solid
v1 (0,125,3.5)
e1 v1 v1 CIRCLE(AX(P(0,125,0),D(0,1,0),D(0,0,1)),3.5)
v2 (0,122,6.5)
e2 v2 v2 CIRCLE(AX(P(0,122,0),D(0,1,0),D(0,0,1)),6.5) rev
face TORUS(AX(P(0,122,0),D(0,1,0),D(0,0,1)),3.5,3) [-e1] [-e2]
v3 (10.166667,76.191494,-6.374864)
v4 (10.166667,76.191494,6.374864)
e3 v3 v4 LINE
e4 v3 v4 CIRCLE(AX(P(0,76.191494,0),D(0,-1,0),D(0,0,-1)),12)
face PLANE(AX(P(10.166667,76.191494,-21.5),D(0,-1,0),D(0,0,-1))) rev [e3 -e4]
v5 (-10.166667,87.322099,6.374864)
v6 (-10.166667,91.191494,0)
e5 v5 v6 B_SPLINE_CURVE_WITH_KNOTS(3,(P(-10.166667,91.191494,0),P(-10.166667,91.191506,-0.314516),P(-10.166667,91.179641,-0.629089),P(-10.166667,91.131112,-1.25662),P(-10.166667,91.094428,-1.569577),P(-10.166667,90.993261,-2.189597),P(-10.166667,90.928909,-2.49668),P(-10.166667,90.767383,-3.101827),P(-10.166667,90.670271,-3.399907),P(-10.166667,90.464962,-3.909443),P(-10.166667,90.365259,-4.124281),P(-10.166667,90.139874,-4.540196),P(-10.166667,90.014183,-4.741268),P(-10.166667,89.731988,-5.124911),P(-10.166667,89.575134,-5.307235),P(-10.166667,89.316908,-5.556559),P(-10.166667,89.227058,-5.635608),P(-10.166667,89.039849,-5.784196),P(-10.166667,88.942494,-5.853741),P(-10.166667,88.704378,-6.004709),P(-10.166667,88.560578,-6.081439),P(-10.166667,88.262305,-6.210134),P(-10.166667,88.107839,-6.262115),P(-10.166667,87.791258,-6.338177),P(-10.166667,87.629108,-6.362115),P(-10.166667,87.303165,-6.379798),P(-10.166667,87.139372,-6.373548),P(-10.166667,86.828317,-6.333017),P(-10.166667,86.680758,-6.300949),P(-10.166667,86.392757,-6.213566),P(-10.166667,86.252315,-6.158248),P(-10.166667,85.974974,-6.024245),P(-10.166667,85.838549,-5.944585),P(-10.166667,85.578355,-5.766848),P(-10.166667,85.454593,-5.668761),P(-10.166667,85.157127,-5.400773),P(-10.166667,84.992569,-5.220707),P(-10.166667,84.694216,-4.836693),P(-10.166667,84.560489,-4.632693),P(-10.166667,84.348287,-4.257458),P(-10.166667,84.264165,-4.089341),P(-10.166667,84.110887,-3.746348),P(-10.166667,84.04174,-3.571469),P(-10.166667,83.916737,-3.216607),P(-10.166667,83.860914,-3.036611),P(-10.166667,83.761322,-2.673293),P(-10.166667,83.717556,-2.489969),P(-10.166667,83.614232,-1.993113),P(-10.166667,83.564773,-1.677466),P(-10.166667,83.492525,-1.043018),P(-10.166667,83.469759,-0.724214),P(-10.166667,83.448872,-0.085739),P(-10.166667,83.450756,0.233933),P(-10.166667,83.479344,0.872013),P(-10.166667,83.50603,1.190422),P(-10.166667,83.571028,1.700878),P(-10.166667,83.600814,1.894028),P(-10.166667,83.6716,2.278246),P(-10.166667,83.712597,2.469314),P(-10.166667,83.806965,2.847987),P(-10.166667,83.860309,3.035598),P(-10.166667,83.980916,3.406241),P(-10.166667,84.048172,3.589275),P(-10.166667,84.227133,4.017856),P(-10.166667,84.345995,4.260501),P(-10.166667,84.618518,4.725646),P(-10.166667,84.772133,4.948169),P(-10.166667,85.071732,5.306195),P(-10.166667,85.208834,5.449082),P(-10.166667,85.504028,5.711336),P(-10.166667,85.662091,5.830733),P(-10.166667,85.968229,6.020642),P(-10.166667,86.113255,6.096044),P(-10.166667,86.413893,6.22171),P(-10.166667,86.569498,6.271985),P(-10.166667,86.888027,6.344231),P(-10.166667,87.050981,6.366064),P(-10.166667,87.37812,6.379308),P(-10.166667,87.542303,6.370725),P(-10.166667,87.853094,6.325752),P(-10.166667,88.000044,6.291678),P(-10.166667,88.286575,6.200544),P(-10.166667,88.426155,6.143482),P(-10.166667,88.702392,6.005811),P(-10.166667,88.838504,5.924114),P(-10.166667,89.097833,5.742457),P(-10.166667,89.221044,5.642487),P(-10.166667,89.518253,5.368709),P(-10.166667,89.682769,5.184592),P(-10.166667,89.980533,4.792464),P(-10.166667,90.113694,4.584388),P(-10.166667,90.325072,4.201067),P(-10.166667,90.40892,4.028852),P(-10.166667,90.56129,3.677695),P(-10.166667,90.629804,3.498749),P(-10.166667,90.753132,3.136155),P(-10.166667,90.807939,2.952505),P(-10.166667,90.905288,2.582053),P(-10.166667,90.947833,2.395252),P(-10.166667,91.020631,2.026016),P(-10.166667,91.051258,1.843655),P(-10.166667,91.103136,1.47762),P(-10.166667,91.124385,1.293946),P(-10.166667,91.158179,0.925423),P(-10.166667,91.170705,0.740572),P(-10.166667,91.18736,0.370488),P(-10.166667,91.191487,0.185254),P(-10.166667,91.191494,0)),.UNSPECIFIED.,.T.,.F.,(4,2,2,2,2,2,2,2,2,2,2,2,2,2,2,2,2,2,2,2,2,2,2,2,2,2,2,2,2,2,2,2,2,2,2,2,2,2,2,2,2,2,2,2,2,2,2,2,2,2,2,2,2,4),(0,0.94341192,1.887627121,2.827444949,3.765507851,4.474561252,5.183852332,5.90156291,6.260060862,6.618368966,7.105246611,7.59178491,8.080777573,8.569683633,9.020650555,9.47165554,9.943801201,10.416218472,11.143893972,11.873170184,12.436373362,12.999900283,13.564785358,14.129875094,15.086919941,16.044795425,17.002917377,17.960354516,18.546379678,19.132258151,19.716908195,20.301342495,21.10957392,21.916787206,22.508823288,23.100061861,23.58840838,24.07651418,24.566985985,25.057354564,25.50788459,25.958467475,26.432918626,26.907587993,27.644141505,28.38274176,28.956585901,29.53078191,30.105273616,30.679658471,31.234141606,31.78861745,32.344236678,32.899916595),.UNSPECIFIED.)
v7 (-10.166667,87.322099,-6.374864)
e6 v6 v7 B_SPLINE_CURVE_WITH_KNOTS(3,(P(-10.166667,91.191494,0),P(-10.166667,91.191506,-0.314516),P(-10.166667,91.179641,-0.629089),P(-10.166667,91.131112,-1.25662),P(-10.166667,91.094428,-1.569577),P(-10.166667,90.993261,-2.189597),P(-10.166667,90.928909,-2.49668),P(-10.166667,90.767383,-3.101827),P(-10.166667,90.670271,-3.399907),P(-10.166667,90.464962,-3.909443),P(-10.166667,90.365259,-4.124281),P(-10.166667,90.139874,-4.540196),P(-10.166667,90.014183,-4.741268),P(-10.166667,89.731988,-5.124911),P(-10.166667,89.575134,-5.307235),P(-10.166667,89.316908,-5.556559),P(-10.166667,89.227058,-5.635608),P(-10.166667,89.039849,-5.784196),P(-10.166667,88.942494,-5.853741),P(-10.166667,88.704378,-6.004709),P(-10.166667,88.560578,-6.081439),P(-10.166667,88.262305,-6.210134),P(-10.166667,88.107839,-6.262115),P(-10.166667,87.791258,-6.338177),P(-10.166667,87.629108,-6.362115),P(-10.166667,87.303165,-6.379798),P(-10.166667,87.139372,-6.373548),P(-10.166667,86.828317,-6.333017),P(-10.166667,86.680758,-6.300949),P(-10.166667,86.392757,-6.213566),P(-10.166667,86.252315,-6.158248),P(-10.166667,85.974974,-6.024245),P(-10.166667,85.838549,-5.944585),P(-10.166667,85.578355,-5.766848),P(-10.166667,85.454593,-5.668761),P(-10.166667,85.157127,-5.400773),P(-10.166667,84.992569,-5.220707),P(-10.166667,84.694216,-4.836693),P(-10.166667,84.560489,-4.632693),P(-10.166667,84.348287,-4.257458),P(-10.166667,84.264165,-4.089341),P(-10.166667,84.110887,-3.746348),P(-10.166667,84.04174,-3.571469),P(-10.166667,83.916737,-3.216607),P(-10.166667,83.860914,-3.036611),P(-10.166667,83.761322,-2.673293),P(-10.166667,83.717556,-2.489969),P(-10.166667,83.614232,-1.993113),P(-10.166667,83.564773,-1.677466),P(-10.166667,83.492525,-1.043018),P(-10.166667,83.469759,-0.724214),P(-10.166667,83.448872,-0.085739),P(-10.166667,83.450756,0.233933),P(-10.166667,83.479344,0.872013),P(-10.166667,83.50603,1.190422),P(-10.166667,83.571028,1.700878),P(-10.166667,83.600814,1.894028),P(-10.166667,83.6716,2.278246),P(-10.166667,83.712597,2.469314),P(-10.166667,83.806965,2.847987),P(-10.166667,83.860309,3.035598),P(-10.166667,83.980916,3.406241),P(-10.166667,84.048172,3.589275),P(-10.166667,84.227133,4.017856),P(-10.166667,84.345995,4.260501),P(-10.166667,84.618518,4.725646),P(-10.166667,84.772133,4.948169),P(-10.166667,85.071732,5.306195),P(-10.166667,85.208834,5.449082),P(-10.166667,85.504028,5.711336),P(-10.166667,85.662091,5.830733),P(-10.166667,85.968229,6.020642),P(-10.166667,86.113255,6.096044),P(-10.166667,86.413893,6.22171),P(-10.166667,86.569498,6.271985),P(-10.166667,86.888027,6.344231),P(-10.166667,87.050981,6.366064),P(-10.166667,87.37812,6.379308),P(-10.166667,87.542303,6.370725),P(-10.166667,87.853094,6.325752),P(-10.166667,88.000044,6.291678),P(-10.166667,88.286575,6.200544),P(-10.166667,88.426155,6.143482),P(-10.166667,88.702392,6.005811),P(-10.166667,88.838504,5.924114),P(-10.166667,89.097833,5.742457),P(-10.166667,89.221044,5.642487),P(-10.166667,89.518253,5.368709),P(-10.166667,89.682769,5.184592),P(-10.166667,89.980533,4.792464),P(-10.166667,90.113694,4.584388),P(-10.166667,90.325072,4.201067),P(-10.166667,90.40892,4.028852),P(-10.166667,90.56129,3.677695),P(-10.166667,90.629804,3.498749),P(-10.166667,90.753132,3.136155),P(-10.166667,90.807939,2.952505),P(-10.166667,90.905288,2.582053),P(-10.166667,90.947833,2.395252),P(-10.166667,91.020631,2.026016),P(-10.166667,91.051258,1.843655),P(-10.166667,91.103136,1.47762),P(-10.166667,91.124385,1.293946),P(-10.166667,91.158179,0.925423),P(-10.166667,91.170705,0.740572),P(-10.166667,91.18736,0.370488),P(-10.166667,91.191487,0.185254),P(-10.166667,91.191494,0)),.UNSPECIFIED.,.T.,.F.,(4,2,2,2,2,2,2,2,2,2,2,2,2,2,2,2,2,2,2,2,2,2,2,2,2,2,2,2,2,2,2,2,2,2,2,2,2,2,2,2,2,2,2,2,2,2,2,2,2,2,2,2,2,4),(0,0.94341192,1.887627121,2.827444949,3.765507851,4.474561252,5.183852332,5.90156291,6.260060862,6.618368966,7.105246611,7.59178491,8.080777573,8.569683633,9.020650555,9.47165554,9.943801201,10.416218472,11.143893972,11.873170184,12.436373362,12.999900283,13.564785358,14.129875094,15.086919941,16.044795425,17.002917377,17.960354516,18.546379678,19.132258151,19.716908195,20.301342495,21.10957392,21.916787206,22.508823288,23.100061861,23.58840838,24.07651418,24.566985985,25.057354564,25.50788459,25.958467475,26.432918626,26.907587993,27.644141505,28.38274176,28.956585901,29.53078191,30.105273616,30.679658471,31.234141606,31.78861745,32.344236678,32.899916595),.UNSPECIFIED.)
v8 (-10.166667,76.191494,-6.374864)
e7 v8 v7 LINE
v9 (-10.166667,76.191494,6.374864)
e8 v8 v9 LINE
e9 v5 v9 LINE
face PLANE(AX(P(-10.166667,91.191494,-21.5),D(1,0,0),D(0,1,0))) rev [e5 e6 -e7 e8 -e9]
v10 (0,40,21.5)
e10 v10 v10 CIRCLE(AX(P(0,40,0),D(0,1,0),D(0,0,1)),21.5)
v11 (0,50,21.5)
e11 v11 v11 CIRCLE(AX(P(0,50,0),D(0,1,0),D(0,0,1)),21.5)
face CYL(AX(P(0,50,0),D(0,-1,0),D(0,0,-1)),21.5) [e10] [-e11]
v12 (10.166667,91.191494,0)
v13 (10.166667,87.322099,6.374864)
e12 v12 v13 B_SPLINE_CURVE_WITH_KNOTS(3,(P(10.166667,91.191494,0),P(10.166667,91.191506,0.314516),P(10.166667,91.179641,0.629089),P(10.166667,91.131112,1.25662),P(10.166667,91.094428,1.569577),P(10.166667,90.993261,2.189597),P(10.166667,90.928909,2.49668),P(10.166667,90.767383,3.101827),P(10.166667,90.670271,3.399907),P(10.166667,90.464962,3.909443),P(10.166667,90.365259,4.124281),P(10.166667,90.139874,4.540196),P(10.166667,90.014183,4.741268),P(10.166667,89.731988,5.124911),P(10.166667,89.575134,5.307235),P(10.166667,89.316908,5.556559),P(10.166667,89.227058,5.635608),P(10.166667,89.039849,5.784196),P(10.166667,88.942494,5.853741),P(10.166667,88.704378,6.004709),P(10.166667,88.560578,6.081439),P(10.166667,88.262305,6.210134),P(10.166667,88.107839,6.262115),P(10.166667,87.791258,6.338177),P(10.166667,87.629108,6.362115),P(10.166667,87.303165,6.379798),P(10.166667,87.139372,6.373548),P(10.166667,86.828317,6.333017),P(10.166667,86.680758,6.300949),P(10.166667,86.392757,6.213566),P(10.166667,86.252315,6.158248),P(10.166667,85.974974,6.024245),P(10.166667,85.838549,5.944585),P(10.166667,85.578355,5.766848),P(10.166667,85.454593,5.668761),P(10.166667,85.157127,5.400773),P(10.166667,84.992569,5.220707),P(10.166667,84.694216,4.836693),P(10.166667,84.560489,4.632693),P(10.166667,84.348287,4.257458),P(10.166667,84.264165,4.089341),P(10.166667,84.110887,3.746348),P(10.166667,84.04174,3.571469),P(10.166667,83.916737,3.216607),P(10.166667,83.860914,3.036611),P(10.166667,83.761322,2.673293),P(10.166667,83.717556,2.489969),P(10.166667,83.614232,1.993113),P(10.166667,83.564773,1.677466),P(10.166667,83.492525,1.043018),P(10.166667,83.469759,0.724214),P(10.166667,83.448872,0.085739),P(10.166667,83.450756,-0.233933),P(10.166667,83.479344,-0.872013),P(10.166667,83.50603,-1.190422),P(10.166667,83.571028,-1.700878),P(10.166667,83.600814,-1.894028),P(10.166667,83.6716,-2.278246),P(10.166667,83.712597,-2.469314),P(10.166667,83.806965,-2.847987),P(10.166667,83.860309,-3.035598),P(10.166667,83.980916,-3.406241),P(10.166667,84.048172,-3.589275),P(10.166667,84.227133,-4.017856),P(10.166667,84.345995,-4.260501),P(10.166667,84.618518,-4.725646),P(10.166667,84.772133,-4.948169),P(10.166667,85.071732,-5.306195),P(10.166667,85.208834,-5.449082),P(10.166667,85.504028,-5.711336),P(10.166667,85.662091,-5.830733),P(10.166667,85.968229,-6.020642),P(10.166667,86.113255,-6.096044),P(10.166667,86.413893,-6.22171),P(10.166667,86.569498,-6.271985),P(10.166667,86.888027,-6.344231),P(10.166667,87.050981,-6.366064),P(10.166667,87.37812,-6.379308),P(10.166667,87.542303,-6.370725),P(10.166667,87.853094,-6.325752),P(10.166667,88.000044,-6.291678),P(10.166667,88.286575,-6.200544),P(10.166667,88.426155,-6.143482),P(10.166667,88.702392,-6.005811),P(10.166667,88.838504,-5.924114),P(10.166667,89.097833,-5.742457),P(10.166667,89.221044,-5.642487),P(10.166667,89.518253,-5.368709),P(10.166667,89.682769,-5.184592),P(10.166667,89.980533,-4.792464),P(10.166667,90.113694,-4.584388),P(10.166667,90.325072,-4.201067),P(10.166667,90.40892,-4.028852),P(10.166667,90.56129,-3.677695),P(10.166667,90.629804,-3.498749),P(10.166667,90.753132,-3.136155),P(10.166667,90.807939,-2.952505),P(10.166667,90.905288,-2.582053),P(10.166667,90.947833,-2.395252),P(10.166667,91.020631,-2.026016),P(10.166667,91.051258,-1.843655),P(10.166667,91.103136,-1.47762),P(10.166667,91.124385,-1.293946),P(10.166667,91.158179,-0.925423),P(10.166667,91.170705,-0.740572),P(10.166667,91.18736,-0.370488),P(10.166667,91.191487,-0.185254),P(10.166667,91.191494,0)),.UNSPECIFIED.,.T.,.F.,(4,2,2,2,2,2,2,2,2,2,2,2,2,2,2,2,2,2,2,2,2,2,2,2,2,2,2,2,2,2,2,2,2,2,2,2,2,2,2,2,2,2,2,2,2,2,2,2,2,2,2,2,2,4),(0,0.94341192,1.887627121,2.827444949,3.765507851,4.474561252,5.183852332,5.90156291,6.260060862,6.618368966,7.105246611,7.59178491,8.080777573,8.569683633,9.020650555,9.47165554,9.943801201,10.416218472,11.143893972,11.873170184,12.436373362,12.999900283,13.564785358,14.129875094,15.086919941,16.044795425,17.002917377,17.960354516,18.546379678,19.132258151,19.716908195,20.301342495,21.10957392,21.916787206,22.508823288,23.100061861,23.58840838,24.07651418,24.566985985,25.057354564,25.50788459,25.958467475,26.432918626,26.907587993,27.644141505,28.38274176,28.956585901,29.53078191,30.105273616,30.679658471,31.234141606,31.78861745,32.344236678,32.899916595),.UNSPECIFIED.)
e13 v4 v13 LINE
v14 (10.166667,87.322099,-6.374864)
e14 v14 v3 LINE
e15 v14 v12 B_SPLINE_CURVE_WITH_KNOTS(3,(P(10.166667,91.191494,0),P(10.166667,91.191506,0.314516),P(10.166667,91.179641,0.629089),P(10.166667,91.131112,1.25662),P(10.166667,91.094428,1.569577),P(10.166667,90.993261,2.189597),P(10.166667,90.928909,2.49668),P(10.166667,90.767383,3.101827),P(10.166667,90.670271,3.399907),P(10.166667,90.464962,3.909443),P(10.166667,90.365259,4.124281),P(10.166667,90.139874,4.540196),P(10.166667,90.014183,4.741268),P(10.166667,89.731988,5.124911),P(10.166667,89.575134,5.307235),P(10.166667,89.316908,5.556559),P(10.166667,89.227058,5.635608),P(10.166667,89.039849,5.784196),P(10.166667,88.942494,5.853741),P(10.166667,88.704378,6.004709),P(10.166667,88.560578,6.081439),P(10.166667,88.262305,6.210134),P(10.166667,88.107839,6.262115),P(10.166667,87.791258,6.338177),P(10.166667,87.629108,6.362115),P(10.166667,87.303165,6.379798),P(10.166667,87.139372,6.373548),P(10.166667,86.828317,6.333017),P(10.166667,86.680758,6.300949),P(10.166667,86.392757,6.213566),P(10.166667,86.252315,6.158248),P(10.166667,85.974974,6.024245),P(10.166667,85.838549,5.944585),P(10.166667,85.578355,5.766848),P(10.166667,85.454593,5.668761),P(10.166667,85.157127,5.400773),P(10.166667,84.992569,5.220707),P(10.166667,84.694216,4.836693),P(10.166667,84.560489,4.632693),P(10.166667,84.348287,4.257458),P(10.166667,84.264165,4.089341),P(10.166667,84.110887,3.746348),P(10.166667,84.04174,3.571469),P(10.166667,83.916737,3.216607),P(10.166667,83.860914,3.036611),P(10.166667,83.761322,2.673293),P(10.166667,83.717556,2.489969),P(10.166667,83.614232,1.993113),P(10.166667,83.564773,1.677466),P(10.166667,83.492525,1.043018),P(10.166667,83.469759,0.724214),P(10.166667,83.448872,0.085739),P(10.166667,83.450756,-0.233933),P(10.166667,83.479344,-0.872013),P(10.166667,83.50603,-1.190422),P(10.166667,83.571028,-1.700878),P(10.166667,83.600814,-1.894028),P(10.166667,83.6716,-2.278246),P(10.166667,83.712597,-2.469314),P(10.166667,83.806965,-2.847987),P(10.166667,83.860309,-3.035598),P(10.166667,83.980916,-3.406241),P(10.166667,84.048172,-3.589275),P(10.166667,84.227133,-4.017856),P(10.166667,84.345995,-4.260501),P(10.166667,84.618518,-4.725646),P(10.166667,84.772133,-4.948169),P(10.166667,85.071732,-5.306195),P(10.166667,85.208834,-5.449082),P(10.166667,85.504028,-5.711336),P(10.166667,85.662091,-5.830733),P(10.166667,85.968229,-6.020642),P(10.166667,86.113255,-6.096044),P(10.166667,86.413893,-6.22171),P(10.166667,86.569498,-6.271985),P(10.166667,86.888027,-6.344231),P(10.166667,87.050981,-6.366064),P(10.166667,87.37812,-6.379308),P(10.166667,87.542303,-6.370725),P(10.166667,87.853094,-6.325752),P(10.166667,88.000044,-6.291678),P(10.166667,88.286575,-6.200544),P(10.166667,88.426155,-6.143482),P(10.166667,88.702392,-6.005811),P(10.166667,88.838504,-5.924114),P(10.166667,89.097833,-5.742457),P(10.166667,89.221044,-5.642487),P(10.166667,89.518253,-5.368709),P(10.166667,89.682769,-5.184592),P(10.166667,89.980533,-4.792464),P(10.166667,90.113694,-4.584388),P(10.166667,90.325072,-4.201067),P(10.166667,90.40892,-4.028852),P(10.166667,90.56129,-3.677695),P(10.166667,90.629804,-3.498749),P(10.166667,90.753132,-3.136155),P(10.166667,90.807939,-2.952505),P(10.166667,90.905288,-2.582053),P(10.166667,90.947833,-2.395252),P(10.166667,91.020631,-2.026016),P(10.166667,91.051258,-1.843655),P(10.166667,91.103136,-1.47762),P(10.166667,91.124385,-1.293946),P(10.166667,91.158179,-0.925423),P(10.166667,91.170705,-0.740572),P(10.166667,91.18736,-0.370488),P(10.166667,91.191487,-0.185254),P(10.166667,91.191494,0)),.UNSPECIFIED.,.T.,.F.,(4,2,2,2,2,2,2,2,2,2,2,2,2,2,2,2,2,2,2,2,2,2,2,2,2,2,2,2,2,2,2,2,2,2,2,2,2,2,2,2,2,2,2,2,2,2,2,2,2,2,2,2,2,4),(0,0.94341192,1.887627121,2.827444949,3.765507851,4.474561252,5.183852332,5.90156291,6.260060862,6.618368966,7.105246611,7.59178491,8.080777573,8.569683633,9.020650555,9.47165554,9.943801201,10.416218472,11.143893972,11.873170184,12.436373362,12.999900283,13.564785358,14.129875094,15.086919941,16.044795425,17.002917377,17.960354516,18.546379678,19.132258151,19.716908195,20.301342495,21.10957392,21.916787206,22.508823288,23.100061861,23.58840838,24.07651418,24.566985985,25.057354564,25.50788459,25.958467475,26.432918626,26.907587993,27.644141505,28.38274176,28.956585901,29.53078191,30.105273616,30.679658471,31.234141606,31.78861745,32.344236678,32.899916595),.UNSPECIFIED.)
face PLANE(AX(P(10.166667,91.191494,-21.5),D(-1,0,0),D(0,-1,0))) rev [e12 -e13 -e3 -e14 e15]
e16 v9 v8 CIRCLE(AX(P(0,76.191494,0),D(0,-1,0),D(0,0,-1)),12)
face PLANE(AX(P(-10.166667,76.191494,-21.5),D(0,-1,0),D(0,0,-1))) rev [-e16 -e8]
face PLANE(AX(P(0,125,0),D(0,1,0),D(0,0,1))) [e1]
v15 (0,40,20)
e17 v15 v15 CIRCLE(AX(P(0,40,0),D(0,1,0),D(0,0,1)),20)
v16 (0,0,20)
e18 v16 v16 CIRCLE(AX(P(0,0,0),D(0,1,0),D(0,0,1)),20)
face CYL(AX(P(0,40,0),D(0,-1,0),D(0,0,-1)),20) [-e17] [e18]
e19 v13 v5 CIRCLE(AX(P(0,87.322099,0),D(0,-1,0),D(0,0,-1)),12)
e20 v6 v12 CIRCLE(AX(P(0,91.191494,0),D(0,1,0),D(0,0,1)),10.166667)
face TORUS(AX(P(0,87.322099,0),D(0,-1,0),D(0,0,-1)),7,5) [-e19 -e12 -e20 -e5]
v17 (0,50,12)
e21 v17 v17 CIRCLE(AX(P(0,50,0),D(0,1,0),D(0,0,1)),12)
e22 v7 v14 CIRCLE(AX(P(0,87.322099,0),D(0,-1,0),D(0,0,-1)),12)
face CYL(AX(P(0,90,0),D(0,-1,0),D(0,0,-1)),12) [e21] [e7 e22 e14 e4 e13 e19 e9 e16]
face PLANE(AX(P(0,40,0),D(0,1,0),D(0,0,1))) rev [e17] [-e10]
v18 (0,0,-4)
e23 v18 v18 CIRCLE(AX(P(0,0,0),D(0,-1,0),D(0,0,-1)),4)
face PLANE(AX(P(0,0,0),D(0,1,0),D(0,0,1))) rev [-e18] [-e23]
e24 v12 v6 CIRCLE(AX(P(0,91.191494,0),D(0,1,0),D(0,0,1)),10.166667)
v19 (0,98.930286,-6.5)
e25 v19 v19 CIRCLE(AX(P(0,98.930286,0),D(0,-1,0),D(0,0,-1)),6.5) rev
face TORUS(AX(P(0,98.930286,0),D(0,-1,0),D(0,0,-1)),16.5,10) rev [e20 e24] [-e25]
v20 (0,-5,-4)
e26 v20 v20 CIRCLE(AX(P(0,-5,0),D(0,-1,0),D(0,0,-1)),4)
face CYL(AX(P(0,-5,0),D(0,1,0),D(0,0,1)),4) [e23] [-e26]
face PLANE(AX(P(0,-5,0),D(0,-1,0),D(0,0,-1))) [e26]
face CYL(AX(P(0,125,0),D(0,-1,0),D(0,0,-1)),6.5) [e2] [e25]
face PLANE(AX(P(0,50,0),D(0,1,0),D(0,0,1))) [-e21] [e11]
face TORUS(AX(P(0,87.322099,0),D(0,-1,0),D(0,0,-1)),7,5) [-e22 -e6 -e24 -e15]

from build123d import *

# Parameters (mm, degrees)
SKETCH1_R               = 20
BOSS_EXTRUDE1_DEPTH     = 40
SKETCH2_R               = 21.5
BOSS_EXTRUDE2_DEPTH     = 10
SKETCH3_R               = 6.5
BOSS_EXTRUDE3_DEPTH     = 75
SKETCH4_R               = 12
BOSS_EXTRUDE4_DEPTH     = 40
FILLET1_R               = 10
FILLET2_R               = 5
FILLET3_R               = 3
SKETCH5_R               = 4
BOSS_EXTRUDE5_DEPTH     = 5
CUT_EXTRUDE1_DEPTH      = 129.64486008
CUT_EXTRUDE1_DEPTH_BACK = 129.64486008
SKETCH6_W               = 1.833333333
SKETCH6_H               = 15


with BuildPart() as part:
    # Sketch1 → Boss-Extrude1 (new body)
    with BuildSketch(Plane(origin=(0, 0, 0), x_dir=(1, 0, 0), z_dir=(0, 1, 0))):
        with Locations(Location((0, 0, 0), (0, 0, 270))):
            Circle(SKETCH1_R)
    extrude(amount=BOSS_EXTRUDE1_DEPTH)

    # Sketch2 → Boss-Extrude2 (add)
    with BuildSketch(Plane(origin=(0, 40, 0), x_dir=(1, 0, 0), z_dir=(0, 1, 0))):
        with Locations(Location((0, 0, 0), (0, 0, 270))):
            Circle(SKETCH2_R)
    extrude(amount=BOSS_EXTRUDE2_DEPTH)

    # Sketch3 → Boss-Extrude3 (add)
    with BuildSketch(Plane(origin=(0, 50, 0), x_dir=(1, 0, 0), z_dir=(0, 1, 0))):
        with Locations(Location((0, 0, 0), (0, 0, 270))):
            Circle(SKETCH3_R)
    extrude(amount=BOSS_EXTRUDE3_DEPTH)

    # Sketch4 → Boss-Extrude4 (add)
    with BuildSketch(Plane(origin=(0, 50, 0), x_dir=(1, 0, 0), z_dir=(0, 1, 0))):
        with Locations(Location((0, 0, 0), (0, 0, 270))):
            Circle(SKETCH4_R)
    extrude(amount=BOSS_EXTRUDE4_DEPTH)

    # Fillet1
    # the kernel refuses this fillet: 10 mm, written as the material it adds along each edge
    with BuildSketch(Plane(origin=(0, 90, 0), x_dir=(0, 0, 1), z_dir=(1, 0, 0))) as fillet1_piece_1:
        with BuildLine():
            CenterArc((16.5, -8.93028555), FILLET1_R, 116.74368395, 63.25631605)
            Line((6.5, -8.93028555), (6.3, -8.93028555))
            Line((6.3, -8.93028555), (6.3, 0))
            Line((6.3, 0), (6.5, 0.2))
            ThreePointArc((6.5, 0.2), (9.25, 0.2), (11.91, 0.178605711))
            Line((11.91, 0.178605711), (12, 0))
        make_face()
    revolve(axis=Axis((0, 90, 0), (0, -1, 0)))

    # Fillet2
    fillet2_edges = [part.edges().sort_by_distance(p)[0] for p in [
        (0, 90, -12),
    ]]
    fillet(fillet2_edges, radius=FILLET2_R)

    # Fillet3
    fillet3_edges = [part.edges().sort_by_distance(p)[0] for p in [
        (0, 125, -6.5),
    ]]
    fillet(fillet3_edges, radius=FILLET3_R)

    # Sketch5 → Boss-Extrude5 (add)
    with BuildSketch(Plane.XZ):
        with Locations(Location((0, 0, 0), (0, 0, 270))):
            Circle(SKETCH5_R)
    extrude(amount=BOSS_EXTRUDE5_DEPTH)

    # Sketch6 → Cut-Extrude1 (cut, two sides: drawn at the far end of the back side and taken through both)
    with BuildSketch(Plane.XY.offset(-CUT_EXTRUDE1_DEPTH_BACK)):
        with Locations((-11.083333334, 83.691494372)):
            Rectangle(SKETCH6_W, SKETCH6_H)
        with Locations((11.083333334, 83.691494372)):
            Rectangle(SKETCH6_W, SKETCH6_H)
    extrude(amount=CUT_EXTRUDE1_DEPTH + CUT_EXTRUDE1_DEPTH_BACK, mode=Mode.SUBTRACT)


solid = part.part
